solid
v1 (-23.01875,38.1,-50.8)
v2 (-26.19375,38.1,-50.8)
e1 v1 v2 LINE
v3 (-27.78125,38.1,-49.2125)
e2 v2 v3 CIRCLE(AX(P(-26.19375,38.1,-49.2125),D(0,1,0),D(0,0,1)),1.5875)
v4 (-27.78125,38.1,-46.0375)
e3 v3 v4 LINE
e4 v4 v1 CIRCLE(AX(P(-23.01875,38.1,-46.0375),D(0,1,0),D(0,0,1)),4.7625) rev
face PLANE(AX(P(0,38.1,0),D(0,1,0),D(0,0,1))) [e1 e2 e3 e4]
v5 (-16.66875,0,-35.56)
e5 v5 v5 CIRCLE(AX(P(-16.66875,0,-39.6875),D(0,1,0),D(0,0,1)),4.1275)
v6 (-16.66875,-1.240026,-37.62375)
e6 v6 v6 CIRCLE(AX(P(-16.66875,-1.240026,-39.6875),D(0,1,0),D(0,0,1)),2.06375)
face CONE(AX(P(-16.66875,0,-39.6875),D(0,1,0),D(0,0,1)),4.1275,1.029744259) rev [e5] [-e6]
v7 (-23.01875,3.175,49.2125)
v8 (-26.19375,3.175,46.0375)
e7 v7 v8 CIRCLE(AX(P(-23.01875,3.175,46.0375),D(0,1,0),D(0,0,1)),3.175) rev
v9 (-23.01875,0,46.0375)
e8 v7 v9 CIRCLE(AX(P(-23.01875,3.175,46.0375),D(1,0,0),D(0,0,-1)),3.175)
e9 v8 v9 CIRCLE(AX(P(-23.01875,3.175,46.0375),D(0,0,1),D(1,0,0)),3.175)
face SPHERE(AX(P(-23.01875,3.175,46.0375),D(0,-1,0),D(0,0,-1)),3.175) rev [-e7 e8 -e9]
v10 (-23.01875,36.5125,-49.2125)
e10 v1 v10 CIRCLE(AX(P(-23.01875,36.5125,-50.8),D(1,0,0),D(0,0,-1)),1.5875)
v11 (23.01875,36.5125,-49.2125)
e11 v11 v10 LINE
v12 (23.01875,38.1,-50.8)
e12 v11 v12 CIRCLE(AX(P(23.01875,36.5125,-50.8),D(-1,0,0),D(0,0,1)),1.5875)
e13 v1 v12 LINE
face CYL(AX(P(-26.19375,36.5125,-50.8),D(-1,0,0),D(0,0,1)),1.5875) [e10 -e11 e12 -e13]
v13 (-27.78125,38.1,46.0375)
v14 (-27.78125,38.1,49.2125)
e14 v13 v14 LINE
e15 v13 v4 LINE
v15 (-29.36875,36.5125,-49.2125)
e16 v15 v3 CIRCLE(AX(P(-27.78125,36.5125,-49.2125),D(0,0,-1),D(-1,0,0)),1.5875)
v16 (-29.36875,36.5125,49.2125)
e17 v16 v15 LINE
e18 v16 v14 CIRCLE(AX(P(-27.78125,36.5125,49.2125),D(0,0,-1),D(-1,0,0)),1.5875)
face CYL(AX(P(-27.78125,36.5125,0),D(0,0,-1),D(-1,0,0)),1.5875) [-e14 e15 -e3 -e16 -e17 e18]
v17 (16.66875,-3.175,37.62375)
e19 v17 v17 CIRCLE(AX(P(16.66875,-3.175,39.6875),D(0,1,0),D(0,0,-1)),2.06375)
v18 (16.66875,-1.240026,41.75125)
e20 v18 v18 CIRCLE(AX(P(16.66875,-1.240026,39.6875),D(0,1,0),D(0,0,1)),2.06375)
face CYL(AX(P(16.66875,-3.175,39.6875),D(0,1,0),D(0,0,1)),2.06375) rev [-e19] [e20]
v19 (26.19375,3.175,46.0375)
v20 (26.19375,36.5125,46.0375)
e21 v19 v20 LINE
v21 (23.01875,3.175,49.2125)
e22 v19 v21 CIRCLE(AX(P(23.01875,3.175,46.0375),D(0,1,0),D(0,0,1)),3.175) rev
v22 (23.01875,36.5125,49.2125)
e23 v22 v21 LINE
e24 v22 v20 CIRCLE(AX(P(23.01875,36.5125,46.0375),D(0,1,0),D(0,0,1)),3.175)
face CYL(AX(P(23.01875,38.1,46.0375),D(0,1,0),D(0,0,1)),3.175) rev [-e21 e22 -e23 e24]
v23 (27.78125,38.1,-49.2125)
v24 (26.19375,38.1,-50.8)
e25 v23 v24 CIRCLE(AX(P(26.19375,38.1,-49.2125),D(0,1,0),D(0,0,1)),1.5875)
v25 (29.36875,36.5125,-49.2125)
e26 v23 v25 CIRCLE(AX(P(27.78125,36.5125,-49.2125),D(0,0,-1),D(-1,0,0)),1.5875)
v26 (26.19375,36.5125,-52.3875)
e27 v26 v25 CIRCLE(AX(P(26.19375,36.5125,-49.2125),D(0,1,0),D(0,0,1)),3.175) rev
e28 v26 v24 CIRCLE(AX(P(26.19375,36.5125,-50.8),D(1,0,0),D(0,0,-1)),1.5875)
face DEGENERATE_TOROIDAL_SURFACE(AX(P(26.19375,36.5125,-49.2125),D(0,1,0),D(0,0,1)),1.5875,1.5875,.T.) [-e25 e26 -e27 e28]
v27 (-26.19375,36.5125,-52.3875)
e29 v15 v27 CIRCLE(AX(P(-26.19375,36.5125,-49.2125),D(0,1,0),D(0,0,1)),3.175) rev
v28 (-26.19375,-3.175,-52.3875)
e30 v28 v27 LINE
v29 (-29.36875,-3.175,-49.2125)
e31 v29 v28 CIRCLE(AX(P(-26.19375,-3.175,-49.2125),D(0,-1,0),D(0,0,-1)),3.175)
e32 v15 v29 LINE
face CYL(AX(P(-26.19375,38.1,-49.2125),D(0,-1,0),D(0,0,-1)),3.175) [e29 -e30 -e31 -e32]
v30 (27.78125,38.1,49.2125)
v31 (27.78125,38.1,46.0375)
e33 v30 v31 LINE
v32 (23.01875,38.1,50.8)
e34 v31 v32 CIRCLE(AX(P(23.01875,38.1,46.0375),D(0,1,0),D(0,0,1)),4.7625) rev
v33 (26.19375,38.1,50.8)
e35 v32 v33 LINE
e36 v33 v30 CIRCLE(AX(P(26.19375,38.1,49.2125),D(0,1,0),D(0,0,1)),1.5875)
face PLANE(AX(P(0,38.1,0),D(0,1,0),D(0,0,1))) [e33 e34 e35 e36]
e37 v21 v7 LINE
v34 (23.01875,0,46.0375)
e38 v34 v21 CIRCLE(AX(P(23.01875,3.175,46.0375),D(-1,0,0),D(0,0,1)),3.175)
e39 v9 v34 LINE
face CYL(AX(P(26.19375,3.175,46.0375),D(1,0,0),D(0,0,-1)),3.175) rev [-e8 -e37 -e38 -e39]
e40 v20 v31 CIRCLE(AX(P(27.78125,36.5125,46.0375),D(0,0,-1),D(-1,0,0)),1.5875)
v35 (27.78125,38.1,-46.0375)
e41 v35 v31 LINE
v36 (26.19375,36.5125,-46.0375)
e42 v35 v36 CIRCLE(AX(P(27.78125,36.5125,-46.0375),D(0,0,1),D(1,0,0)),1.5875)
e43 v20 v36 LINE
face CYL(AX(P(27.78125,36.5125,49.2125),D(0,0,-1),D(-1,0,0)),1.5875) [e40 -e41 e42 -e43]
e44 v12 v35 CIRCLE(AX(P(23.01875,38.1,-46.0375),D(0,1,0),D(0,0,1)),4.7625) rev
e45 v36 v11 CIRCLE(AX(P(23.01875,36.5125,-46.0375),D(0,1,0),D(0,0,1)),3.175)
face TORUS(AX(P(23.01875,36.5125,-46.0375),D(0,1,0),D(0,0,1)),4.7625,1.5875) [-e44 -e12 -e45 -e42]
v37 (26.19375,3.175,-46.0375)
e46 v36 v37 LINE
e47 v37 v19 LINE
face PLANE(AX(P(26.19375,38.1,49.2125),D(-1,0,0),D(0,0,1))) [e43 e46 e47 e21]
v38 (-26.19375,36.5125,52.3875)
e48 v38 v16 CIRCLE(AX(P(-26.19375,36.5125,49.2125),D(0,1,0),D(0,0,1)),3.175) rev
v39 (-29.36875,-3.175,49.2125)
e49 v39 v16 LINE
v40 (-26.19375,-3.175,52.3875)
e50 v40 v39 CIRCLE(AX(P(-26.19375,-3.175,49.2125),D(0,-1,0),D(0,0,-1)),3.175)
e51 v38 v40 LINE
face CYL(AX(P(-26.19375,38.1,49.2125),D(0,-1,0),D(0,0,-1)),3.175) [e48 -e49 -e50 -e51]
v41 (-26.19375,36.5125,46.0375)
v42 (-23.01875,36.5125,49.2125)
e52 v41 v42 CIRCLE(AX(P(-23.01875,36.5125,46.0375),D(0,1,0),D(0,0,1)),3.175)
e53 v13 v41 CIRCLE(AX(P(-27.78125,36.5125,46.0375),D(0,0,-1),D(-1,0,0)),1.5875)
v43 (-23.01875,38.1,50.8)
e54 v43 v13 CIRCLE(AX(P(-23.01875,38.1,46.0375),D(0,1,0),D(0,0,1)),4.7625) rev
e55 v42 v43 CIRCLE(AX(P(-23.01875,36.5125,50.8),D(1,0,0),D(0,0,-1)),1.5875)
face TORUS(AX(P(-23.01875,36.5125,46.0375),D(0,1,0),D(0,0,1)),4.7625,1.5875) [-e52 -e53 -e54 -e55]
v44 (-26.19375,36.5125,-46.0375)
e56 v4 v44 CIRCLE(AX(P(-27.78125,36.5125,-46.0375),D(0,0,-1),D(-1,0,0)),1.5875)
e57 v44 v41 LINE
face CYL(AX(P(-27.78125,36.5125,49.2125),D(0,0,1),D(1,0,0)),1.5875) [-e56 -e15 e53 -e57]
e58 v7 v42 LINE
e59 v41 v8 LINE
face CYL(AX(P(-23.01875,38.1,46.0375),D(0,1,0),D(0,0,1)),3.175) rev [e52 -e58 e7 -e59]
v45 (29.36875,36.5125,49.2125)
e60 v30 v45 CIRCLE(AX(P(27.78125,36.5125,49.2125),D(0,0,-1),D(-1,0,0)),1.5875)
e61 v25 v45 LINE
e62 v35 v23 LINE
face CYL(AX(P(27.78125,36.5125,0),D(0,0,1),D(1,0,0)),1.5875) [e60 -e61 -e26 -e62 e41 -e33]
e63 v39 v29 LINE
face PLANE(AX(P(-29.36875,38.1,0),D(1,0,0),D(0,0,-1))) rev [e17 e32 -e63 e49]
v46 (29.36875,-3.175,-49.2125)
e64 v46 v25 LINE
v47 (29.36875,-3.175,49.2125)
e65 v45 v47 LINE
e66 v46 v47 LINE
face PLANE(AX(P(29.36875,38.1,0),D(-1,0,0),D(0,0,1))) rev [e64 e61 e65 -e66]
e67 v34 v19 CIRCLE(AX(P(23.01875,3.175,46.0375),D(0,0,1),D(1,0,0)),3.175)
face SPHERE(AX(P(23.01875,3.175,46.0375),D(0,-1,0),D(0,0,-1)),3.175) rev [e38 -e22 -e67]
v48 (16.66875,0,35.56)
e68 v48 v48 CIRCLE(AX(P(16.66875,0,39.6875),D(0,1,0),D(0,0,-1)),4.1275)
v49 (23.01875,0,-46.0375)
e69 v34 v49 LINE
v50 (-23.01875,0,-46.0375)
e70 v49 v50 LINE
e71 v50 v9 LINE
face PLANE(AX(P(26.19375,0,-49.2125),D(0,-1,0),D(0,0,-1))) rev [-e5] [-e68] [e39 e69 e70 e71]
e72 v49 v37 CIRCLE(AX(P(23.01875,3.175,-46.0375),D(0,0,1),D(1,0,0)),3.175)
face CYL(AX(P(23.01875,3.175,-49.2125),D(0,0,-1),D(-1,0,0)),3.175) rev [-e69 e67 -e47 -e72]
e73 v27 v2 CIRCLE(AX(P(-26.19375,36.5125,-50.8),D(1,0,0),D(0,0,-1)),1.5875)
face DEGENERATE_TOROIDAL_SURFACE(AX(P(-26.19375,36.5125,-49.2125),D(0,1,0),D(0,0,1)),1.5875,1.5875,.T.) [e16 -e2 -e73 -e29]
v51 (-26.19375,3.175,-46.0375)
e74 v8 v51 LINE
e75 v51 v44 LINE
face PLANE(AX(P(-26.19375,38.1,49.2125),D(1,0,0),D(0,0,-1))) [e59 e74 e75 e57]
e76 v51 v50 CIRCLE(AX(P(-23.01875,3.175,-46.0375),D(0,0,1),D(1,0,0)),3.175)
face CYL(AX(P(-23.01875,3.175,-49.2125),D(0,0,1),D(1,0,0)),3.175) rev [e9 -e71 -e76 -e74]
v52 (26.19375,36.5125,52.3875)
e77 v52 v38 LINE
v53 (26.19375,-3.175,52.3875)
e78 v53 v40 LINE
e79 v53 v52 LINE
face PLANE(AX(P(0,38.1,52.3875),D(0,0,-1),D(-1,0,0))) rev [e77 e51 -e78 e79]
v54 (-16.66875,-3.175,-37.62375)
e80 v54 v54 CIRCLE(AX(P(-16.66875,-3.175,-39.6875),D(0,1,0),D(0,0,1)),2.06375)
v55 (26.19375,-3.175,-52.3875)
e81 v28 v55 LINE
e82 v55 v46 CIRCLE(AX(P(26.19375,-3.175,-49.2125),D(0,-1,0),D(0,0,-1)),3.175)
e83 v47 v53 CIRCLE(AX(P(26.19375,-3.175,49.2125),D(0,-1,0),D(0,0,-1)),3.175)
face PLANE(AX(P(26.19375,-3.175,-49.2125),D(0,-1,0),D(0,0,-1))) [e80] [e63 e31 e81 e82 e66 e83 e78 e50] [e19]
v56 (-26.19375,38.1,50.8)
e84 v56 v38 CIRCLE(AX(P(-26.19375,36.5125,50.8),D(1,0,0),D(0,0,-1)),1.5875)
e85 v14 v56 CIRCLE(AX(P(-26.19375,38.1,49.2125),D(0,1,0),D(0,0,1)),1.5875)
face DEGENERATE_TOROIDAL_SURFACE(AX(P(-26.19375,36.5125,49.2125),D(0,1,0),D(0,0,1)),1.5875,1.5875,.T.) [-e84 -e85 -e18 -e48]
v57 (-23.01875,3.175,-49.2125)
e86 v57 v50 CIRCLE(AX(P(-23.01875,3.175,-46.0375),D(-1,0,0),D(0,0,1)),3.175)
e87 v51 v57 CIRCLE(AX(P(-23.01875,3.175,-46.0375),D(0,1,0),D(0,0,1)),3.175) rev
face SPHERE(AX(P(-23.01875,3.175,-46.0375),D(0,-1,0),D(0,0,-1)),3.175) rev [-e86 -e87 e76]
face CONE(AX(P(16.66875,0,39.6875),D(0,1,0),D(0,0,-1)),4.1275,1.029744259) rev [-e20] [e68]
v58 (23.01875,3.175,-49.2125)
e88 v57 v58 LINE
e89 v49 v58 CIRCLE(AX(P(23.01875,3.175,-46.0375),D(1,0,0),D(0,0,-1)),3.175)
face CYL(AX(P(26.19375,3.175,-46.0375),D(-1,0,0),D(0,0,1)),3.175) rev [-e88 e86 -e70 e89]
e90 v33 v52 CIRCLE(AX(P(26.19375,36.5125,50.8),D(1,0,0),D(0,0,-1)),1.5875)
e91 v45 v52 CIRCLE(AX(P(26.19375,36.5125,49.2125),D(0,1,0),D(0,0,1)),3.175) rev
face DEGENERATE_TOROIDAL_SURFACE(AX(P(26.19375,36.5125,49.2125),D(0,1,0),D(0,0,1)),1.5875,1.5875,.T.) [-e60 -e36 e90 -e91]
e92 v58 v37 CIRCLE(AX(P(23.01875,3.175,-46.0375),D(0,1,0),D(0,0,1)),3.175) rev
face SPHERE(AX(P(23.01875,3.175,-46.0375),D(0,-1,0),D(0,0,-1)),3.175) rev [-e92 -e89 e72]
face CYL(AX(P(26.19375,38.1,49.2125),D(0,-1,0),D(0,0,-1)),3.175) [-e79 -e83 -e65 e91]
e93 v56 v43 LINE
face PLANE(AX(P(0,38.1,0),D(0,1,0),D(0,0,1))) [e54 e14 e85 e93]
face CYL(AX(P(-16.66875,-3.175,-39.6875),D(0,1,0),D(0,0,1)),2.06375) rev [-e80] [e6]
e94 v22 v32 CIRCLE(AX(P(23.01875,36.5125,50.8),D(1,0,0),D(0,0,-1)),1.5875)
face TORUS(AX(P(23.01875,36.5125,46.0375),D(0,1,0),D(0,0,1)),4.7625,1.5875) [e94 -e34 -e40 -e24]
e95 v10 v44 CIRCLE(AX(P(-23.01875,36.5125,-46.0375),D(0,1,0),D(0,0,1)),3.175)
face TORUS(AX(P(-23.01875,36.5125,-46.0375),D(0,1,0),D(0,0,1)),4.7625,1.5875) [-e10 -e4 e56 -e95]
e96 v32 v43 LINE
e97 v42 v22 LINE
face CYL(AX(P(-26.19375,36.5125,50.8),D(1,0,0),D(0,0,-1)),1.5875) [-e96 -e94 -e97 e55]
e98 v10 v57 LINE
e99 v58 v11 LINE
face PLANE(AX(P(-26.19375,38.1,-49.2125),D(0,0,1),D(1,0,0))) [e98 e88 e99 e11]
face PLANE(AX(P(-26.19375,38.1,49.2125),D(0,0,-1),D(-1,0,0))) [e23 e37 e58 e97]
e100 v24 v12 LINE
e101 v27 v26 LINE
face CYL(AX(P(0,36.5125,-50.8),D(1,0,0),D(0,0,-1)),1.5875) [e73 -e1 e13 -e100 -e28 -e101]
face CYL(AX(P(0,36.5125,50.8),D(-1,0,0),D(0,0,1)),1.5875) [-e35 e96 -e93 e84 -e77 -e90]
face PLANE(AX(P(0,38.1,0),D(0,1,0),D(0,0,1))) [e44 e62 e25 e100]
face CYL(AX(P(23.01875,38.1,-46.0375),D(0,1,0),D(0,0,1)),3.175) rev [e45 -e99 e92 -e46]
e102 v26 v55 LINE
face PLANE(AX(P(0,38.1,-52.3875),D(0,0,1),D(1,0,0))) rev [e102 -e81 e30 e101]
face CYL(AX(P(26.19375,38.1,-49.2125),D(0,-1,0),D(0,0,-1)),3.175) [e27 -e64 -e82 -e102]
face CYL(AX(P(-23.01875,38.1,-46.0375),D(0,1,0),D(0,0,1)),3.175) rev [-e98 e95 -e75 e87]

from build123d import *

# Parameters (mm, degrees)
SKETCH1_W           = 58.7375
SKETCH1_H           = 104.775
SKETCH1_W_2         = 52.3875
SKETCH1_H_2         = 98.425
EXTRUDE_THIN1_DEPTH = 38.1
FILLET1_R           = 3.175
BOSS_EXTRUDE1_DEPTH = 3.175
FILLET2_R           = 3.175
SKETCH3_R           = 2.06375
CUT_EXTRUDE1_DEPTH  = 3.175
CIRPATTERN1_COUNT   = 2
FILLET3_R           = 1.5875


with BuildPart() as part:
    # Sketch1 → Extrude-Thin1 (new body)
    with BuildSketch(Plane(origin=(0, 0, 0), x_dir=(1, 0, 0), z_dir=(0, 1, 0))):
        Rectangle(SKETCH1_W, SKETCH1_H)
        Rectangle(SKETCH1_W_2, SKETCH1_H_2, mode=Mode.SUBTRACT)
    extrude(amount=EXTRUDE_THIN1_DEPTH)

    # Fillet1
    fillet1_edges = [part.edges().sort_by_distance(p)[0] for p in [
        (26.19375, 19.05, 49.2125),
        (26.19375, 19.05, -49.2125),
        (-26.19375, 19.05, -49.2125),
        (-26.19375, 19.05, 49.2125),
        (29.36875, 19.05, 52.3875),
        (-29.36875, 19.05, 52.3875),
        (-29.36875, 19.05, -52.3875),
        (29.36875, 19.05, -52.3875),
    ]]
    fillet(fillet1_edges, radius=FILLET1_R)

    # Sketch2 → Boss-Extrude1 (add)
    with BuildSketch(Plane.XZ):
        with BuildLine():
            Line((29.36875, -49.2125), (29.36875, 49.2125))
            ThreePointArc((29.36875, 49.2125), (28.43881403, 51.45756403), (26.19375, 52.3875))
            Line((26.19375, 52.3875), (-26.19375, 52.3875))
            ThreePointArc((-26.19375, 52.3875), (-28.43881403, 51.45756403), (-29.36875, 49.2125))
            Line((-29.36875, 49.2125), (-29.36875, -49.2125))
            ThreePointArc((-29.36875, -49.2125), (-28.43881403, -51.45756403), (-26.19375, -52.3875))
            Line((-26.19375, -52.3875), (26.19375, -52.3875))
            ThreePointArc((26.19375, -52.3875), (28.43881403, -51.45756403), (29.36875, -49.2125))
        make_face()
    extrude(amount=BOSS_EXTRUDE1_DEPTH)

    # Fillet2
    fillet2_edges = [part.edges().sort_by_distance(p)[0] for p in [
        (26.19375, 0, 0),
        (0, 0, -49.2125),
        (-26.19375, 0, 0),
        (0, 0, 49.2125),
        (-25.26381403, 0, 48.28256403),
        (25.26381403, 0, 48.28256403),
        (25.26381403, 0, -48.28256403),
        (-25.26381403, 0, -48.28256403),
    ]]
    fillet(fillet2_edges, radius=FILLET2_R)

    # Sketch3 → Cut-Extrude1 (cut)
    with BuildSketch(Plane(origin=(0, 0, 0), x_dir=(1, 0, 0), z_dir=(0, 1, 0))):
        with Locations(Location((-16.66875, 39.6875, 0), (0, 0, 270))):
            Circle(SKETCH3_R)
    cut_extrude1 = extrude(amount=-CUT_EXTRUDE1_DEPTH, mode=Mode.SUBTRACT)

    # Sketch4 → Cut-Revolve1 (revolve, cut)
    with BuildSketch(Plane.YX.offset(39.6875), mode=Mode.PRIVATE) as cut_revolve1_sk:
        Polygon((-2.480052205, -16.66875), (0, -12.54125), (0, -16.66875), align=None)
    cut_revolve1 = revolve(cut_revolve1_sk.sketch.rotate(Axis((-16.66875, 0, -39.6875), (0, -1, 0)), 90), axis=Axis((-16.66875, 0, -39.6875), (0, -1, 0)), mode=Mode.SUBTRACT)

    # CirPattern1: Cut-Extrude1, Cut-Revolve1 ×2 about axis
    cirpattern1_axis = Axis((0, 0, 0), (0, 1, 0))
    add([cut_extrude1.rotate(cirpattern1_axis, i * 360 / CIRPATTERN1_COUNT) for i in range(1, CIRPATTERN1_COUNT)], mode=Mode.SUBTRACT)
    add([cut_revolve1.rotate(cirpattern1_axis, i * 360 / CIRPATTERN1_COUNT) for i in range(1, CIRPATTERN1_COUNT)], mode=Mode.SUBTRACT)

    # Fillet3
    fillet3_edges = [part.edges().sort_by_distance(p)[0] for p in [
        (29.36875, 38.1, 0),
        (0, 38.1, 52.3875),
        (0, 38.1, -52.3875),
        (-29.36875, 38.1, 0),
        (0, 38.1, -49.2125),
        (26.19375, 38.1, 0),
        (0, 38.1, 49.2125),
        (-26.19375, 38.1, 0),
        (-28.43881403, 38.1, 51.45756403),
        (28.43881403, 38.1, -51.45756403),
        (-28.43881403, 38.1, -51.45756403),
        (28.43881403, 38.1, 51.45756403),
        (-25.26381403, 38.1, 48.28256403),
        (25.26381403, 38.1, 48.28256403),
        (25.26381403, 38.1, -48.28256403),
        (-25.26381403, 38.1, -48.28256403),
    ]]
    fillet(fillet3_edges, radius=FILLET3_R - 0.0001)  # a hair under: the kernel refuses the full size


solid = part.part
